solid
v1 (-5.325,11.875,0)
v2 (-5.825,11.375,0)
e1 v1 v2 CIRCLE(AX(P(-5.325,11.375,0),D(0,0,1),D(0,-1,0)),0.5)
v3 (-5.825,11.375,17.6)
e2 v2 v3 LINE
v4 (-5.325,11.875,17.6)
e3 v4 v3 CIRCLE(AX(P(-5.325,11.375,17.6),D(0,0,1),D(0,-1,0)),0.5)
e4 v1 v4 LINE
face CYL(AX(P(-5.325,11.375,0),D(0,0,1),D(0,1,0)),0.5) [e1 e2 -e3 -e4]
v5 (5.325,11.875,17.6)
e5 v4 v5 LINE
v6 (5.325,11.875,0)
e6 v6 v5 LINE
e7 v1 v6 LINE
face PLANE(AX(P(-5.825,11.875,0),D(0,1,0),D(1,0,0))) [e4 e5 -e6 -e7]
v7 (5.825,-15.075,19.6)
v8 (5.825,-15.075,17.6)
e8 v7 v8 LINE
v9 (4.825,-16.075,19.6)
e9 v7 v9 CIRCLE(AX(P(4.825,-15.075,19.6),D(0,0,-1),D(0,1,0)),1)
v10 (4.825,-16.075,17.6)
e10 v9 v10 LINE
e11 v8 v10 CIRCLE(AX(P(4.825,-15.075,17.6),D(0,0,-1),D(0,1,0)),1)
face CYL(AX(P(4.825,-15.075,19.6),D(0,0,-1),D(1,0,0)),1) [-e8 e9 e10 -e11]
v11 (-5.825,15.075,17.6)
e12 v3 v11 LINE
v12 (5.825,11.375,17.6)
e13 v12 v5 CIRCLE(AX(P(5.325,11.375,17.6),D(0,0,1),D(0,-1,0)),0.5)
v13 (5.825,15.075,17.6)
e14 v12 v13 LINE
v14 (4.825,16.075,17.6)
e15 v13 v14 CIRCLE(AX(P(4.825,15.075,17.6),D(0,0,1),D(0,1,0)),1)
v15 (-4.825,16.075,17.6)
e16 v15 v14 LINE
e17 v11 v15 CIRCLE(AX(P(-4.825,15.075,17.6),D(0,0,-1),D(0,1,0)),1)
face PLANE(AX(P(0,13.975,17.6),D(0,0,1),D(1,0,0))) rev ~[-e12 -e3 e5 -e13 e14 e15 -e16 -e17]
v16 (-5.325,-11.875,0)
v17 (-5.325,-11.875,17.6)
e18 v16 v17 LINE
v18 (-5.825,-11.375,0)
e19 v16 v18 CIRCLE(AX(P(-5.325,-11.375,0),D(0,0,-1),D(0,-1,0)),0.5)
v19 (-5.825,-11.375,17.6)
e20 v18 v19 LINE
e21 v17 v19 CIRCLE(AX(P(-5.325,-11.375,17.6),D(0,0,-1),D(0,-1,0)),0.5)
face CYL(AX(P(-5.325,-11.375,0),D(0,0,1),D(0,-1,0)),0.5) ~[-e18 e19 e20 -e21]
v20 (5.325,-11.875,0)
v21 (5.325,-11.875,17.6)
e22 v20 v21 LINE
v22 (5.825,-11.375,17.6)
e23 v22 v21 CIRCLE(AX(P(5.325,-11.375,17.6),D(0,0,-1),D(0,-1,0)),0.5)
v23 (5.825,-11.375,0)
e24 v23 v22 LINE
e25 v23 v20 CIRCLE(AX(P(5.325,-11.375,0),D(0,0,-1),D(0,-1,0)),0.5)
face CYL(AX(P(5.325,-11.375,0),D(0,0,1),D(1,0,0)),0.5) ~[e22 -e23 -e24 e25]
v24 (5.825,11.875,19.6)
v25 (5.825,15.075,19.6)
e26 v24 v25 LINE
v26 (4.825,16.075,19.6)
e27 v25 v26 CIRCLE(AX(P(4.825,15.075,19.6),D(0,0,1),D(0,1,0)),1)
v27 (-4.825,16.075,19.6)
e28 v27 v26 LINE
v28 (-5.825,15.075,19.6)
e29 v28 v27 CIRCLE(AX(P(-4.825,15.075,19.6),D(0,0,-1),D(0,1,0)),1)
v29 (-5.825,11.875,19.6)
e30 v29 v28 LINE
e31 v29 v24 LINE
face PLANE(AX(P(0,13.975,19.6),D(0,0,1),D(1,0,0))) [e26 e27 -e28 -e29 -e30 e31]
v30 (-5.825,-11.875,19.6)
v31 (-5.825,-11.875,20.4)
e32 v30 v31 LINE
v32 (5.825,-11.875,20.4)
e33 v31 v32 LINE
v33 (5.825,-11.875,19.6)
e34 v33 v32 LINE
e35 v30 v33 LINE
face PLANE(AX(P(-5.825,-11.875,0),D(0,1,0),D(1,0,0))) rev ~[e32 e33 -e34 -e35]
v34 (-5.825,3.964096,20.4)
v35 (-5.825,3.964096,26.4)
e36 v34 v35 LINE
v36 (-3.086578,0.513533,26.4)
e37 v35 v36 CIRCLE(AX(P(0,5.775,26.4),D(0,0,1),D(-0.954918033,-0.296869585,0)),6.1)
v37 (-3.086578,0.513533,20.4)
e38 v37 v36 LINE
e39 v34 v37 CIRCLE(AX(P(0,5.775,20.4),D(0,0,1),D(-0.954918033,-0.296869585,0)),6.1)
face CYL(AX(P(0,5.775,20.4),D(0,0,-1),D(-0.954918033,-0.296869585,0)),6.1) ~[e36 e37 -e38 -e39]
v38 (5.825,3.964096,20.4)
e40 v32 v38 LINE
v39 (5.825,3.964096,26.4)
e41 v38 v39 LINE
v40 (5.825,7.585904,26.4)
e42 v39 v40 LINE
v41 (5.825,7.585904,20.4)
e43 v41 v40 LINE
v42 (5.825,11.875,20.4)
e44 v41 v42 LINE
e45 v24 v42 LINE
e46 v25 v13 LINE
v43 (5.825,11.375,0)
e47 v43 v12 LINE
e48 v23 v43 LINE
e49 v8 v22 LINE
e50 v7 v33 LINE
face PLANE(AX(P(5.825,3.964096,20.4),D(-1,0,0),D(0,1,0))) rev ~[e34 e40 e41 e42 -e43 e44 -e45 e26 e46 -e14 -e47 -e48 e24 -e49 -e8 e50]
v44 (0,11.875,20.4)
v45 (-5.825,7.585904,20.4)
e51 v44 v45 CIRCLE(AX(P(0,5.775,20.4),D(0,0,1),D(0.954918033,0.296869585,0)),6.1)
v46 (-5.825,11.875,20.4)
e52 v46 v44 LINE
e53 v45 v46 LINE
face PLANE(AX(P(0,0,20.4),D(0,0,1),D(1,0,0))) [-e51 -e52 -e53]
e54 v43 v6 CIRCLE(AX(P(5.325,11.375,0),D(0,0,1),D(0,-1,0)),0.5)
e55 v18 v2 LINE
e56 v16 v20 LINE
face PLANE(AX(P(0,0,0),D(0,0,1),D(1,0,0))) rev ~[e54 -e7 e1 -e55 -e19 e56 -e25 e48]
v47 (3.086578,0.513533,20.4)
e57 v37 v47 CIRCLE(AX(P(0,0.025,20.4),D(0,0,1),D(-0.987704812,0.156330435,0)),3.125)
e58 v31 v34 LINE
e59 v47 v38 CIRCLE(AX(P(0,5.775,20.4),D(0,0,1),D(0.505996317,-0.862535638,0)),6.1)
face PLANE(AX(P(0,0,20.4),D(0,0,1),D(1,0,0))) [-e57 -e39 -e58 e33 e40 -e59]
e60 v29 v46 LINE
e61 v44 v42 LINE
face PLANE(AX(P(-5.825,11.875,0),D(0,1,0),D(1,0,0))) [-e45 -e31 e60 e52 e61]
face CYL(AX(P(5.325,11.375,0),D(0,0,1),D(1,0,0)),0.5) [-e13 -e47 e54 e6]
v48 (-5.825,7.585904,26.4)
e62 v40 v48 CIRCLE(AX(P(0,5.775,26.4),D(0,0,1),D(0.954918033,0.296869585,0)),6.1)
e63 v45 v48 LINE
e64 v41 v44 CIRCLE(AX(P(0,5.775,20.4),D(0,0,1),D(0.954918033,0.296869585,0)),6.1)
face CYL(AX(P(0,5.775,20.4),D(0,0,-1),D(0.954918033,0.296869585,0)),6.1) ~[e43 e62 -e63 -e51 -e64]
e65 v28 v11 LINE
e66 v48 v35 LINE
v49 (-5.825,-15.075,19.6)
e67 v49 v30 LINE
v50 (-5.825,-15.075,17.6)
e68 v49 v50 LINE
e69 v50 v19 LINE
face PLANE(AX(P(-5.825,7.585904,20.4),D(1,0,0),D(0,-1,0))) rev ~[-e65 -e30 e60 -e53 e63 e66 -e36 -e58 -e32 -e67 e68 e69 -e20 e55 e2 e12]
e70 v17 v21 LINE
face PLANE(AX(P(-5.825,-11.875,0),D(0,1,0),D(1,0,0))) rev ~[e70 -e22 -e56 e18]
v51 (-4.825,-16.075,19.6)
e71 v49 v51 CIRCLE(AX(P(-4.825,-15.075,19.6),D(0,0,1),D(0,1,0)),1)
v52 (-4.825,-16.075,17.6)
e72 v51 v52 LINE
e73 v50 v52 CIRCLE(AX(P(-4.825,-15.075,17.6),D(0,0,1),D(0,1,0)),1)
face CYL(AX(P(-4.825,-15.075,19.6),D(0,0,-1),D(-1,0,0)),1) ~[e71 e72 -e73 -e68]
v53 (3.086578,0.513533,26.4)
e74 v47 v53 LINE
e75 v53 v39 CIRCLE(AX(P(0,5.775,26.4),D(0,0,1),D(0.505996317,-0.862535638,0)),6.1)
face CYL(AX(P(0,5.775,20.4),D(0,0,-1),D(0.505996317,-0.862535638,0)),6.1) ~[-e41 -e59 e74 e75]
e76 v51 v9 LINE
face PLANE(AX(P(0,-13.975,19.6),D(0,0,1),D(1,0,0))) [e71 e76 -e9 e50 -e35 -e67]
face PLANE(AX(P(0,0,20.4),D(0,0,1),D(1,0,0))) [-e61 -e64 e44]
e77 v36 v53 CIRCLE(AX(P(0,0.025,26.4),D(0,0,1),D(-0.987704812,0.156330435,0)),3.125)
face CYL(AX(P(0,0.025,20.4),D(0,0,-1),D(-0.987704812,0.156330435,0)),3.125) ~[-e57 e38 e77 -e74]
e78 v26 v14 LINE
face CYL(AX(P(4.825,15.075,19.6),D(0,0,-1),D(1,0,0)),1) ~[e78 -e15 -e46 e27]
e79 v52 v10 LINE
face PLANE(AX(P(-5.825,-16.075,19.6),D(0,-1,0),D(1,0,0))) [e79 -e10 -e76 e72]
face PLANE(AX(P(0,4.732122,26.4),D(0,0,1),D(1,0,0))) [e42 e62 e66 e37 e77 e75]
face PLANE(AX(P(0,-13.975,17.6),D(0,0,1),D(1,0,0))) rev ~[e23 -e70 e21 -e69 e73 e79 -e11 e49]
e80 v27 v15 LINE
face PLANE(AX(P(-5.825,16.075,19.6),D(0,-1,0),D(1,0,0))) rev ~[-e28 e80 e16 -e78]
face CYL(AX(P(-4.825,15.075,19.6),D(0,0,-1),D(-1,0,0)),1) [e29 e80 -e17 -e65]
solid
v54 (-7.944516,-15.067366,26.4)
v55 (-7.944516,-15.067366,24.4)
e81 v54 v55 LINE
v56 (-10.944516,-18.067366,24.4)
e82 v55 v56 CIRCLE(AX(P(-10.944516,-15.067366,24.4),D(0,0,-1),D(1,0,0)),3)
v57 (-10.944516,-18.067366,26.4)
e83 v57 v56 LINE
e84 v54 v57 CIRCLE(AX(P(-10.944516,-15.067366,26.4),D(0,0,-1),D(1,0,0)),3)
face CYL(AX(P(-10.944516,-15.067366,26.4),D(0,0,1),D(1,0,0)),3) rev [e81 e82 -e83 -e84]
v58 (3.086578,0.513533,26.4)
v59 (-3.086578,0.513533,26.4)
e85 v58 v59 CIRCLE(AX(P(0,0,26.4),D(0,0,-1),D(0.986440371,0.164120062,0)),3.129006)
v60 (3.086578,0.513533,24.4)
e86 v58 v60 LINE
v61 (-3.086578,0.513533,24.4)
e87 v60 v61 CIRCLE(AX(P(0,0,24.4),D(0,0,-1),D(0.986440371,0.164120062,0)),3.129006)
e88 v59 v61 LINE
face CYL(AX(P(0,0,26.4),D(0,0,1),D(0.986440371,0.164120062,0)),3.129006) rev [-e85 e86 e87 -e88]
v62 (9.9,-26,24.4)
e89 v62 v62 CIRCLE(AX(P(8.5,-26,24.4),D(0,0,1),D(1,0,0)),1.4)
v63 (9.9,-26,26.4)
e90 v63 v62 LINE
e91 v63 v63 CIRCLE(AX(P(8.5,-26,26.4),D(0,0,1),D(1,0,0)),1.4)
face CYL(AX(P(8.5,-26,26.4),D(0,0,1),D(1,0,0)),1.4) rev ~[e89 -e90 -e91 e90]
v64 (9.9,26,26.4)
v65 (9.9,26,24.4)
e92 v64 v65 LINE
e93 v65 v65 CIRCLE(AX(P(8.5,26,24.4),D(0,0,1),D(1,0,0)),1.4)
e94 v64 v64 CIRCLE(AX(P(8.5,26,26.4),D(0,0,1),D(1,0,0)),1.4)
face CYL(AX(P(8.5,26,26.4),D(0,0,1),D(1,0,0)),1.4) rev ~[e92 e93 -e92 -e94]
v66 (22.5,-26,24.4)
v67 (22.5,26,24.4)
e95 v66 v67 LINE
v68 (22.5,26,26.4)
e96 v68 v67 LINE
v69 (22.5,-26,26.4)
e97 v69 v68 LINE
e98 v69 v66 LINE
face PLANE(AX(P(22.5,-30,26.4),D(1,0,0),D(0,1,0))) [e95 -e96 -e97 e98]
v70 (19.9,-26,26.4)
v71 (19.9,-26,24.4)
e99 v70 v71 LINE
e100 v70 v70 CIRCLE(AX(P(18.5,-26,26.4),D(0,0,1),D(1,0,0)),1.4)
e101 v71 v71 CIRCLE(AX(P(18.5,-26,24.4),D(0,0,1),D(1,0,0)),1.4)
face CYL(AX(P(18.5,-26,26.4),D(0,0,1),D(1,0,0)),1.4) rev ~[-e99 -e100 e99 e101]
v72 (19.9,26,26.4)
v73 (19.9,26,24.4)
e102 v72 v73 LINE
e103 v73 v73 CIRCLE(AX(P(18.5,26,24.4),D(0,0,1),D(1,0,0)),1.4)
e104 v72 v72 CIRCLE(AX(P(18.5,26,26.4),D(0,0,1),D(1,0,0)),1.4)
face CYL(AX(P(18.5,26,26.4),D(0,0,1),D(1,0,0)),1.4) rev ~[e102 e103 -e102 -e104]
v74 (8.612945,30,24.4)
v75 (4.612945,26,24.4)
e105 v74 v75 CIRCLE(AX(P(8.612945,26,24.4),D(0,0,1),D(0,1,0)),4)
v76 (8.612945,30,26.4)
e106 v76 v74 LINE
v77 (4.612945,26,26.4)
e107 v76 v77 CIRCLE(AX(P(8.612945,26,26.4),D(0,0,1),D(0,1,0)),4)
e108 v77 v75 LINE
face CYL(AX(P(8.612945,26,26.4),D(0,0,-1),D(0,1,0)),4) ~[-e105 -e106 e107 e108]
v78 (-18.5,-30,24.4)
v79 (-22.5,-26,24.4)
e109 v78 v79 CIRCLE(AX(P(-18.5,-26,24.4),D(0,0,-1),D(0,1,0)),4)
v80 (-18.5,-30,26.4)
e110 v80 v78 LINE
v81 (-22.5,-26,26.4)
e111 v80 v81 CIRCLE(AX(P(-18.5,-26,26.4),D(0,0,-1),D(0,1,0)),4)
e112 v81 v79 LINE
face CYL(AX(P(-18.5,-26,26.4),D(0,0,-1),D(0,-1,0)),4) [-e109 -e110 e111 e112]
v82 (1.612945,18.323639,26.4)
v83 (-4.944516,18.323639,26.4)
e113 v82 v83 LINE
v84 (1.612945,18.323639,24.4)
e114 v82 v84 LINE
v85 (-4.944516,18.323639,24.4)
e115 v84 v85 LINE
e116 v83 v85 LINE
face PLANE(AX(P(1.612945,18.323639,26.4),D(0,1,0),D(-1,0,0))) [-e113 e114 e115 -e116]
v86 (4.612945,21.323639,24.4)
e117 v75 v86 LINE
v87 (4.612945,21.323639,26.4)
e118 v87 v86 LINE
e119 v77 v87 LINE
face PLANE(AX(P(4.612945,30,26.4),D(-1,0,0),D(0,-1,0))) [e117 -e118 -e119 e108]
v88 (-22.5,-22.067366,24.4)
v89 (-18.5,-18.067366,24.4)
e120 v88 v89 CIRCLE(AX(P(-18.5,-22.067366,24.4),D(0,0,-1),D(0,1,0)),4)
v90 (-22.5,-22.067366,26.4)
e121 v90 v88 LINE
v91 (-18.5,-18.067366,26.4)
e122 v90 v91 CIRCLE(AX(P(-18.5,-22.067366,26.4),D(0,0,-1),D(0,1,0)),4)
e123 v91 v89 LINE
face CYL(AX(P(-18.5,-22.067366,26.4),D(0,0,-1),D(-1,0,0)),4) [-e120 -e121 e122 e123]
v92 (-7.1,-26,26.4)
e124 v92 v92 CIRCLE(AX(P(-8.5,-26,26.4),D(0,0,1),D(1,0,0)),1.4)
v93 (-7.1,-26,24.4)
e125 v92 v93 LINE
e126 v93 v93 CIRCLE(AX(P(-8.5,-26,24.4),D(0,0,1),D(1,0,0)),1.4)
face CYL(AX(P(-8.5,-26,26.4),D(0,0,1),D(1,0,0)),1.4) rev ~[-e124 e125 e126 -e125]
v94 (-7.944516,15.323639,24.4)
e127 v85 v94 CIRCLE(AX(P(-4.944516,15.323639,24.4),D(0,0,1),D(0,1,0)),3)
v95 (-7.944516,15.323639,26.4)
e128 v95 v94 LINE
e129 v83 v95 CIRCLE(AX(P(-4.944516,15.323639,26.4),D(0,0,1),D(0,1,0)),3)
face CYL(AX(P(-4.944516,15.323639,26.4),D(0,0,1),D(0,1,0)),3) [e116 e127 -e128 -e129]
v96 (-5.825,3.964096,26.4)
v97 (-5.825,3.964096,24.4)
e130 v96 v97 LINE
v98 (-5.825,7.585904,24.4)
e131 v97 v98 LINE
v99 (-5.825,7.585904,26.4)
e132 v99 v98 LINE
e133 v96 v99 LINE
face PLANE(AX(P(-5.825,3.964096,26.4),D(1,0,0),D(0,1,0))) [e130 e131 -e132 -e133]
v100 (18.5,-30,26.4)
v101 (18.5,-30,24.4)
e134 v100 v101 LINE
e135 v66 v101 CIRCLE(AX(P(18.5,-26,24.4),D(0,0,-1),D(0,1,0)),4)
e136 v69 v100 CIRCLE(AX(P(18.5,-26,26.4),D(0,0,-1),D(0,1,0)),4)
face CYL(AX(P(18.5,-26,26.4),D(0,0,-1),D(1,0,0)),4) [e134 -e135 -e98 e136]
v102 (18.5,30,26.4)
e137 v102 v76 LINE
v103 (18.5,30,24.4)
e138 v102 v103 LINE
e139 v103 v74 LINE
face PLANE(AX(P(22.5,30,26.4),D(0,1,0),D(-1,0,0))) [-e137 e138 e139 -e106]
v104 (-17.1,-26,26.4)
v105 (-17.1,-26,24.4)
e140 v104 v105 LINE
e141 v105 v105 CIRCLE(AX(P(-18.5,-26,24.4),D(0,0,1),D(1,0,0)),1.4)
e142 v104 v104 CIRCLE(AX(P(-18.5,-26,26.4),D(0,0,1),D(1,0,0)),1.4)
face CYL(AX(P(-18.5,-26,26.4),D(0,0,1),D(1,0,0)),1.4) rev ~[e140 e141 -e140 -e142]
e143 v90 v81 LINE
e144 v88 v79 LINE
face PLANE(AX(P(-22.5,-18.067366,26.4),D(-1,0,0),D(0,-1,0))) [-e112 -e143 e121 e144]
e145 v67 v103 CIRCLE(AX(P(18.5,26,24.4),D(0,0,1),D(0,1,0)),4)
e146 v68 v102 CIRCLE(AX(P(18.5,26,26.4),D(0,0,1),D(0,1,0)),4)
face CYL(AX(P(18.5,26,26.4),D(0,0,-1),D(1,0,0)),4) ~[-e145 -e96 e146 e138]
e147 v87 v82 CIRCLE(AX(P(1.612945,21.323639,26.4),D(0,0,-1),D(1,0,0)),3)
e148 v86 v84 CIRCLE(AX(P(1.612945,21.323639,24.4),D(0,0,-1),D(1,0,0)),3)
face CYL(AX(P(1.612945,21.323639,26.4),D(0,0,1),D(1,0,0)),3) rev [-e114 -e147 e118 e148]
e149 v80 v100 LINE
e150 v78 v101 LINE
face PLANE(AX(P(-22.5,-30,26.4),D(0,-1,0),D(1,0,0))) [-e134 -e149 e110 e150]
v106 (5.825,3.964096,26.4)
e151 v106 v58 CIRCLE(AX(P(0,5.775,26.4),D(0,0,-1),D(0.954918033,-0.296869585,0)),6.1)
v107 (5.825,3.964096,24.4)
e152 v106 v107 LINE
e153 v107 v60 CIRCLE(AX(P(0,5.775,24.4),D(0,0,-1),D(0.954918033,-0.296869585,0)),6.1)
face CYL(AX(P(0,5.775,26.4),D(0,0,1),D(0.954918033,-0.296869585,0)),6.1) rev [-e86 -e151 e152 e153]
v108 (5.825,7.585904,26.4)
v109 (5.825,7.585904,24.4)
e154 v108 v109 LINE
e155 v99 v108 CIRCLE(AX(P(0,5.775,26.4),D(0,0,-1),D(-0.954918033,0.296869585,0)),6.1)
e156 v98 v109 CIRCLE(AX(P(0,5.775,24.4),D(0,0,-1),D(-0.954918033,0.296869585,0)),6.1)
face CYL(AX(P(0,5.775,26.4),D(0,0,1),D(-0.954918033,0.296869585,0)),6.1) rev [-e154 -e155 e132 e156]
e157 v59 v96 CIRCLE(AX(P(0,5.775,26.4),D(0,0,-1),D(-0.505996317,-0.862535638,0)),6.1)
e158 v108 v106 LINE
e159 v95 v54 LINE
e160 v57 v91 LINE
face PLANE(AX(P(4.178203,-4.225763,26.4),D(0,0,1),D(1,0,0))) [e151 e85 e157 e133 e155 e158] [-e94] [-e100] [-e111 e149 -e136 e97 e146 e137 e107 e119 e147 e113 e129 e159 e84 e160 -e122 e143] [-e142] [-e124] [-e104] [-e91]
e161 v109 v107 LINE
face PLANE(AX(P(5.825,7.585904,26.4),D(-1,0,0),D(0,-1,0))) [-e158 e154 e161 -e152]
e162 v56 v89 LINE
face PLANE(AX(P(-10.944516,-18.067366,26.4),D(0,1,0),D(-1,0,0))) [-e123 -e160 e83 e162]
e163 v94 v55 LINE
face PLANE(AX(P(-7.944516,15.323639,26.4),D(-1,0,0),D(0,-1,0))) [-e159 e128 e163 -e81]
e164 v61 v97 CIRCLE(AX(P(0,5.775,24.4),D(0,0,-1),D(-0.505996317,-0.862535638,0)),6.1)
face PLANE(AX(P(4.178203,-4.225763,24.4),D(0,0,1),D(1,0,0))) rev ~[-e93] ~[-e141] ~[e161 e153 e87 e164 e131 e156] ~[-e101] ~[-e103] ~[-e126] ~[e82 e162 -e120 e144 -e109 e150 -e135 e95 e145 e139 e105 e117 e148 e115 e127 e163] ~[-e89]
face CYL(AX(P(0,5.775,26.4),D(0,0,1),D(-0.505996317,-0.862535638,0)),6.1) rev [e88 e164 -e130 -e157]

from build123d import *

# Parameters (mm, degrees)
F0_W     = 11.65
F0_H     = 23.75
F1_DEPTH = 20.4
F3_DEPTH = 6
F5_START = -0.8
F4_W     = 11.65
F4_H     = 4.2
F5_DEPTH = 2
F6_R     = 0.5
F7_R     = 1
F8_R     = 1.4
F9_DEPTH = 2
F10_R    = 4


with BuildPart() as f1:
    # F0 (on Top) → F1 (new body)
    with BuildSketch(Plane.XY):
        Rectangle(F0_W, F0_H)
    extrude(amount=F1_DEPTH)

    # F2 (on face) → F3 (join)
    with BuildSketch(Plane.XY.offset(20.4)):
        with BuildLine():
            Line((5.825, 3.9640955299), (5.825, 7.5859044701))
            ThreePointArc((5.825, 7.5859044701), (0, 11.875), (-5.825, 7.5859044701))
            Line((-5.825, 7.5859044701), (-5.825, 3.9640955299))
            ThreePointArc((-5.825, 3.9640955299), (-4.7781429098, 1.9829886164), (-3.0865775367, 0.5135326087))
            ThreePointArc((-3.0865775367, 0.5135326087), (0, -3.1), (3.0865775367, 0.5135326087))
            ThreePointArc((3.0865775367, 0.5135326087), (4.7781429098, 1.9829886164), (5.825, 3.9640955299))
        make_face()
    extrude(amount=F3_DEPTH)

    # F4 (on face) → F5 (join)
    with BuildSketch(Plane.XY.offset(20.4).offset(F5_START)):
        with Locations((0, -13.975)):
            Rectangle(F4_W, F4_H)
        with Locations((0, 13.975)):
            Rectangle(F4_W, F4_H)
    extrude(amount=-F5_DEPTH)

    # F6
    f6_edges = [f1.edges().sort_by_distance(p)[0] for p in [
        (5.825, 11.875, 8.8),
        (5.825, -11.875, 8.8),
        (-5.825, -11.875, 8.8),
        (-5.825, 11.875, 8.8),
    ]]
    fillet(f6_edges, radius=F6_R)

    # F7
    f7_edges = [f1.edges().sort_by_distance(p)[0] for p in [
        (-5.825, 16.075, 18.6),
        (5.825, 16.075, 18.6),
        (5.825, -16.075, 18.6),
        (-5.825, -16.075, 18.6),
    ]]
    fillet(f7_edges, radius=F7_R)


with BuildPart() as f9:
    # F8 (on face) → F9 (new body)
    with BuildSketch(Plane.XY.offset(26.4)):
        with BuildLine():
            Line((22.5, -30), (22.5, 30))
            Line((22.5, 30), (4.6129450202, 30))
            Line((4.6129450202, 30), (4.6129450202, 21.3236394078))
            ThreePointArc((4.6129450202, 21.3236394078), (3.7342653638, 19.2023190642), (1.6129450202, 18.3236394078))
            Line((1.6129450202, 18.3236394078), (-4.9445159063, 18.3236394078))
            ThreePointArc((-4.9445159063, 18.3236394078), (-7.0658362498, 17.4449597513), (-7.9445159063, 15.3236394078))
            Line((-7.9445159063, 15.3236394078), (-7.9445159063, -15.0673655123))
            ThreePointArc((-7.9445159063, -15.0673655123), (-8.8231955627, -17.1886858558), (-10.9445159063, -18.0673655123))
            Line((-10.9445159063, -18.0673655123), (-22.5, -18.0673655123))
            Line((-22.5, -18.0673655123), (-22.5, -30))
            Line((-22.5, -30), (22.5, -30))
        make_face()
        with Locations((-18.5, -26)):
            Circle(F8_R, mode=Mode.SUBTRACT)
        with Locations((-8.5, -26)):
            Circle(F8_R, mode=Mode.SUBTRACT)
        with Locations((8.5, -26)):
            Circle(F8_R, mode=Mode.SUBTRACT)
        with Locations((18.5, -26)):
            Circle(F8_R, mode=Mode.SUBTRACT)
        with BuildLine():
            ThreePointArc((5.825, 3.9640955299), (4.7781429098, 1.9829886164), (3.0865775367, 0.5135326087))
            ThreePointArc((3.0865775367, 0.5135326087), (0, -3.1290056936), (-3.0865775367, 0.5135326087))
            ThreePointArc((-3.0865775367, 0.5135326087), (-4.7781429098, 1.9829886164), (-5.825, 3.9640955299))
            Line((-5.825, 3.9640955299), (-5.825, 7.5859044701))
            ThreePointArc((-5.825, 7.5859044701), (0, 11.875), (5.825, 7.5859044701))
            Line((5.825, 7.5859044701), (5.825, 3.9640955299))
        make_face(mode=Mode.SUBTRACT)
        with Locations((8.5, 26)):
            Circle(F8_R, mode=Mode.SUBTRACT)
        with Locations((18.5, 26)):
            Circle(F8_R, mode=Mode.SUBTRACT)
    extrude(amount=-F9_DEPTH)

    # F10
    f10_edges = [f9.edges().sort_by_distance(p)[0] for p in [
        (-22.5, -30, 25.4),
        (22.5, 30, 25.4),
        (22.5, -30, 25.4),
        (4.612945, 30, 25.4),
        (-22.5, -18.067366, 25.4),
    ]]
    fillet(f10_edges, radius=F10_R)


with BuildPart() as f11_1:
    # F11: copy of F9
    add(f9.part)


solid = Compound([f1.part, f9.part])
